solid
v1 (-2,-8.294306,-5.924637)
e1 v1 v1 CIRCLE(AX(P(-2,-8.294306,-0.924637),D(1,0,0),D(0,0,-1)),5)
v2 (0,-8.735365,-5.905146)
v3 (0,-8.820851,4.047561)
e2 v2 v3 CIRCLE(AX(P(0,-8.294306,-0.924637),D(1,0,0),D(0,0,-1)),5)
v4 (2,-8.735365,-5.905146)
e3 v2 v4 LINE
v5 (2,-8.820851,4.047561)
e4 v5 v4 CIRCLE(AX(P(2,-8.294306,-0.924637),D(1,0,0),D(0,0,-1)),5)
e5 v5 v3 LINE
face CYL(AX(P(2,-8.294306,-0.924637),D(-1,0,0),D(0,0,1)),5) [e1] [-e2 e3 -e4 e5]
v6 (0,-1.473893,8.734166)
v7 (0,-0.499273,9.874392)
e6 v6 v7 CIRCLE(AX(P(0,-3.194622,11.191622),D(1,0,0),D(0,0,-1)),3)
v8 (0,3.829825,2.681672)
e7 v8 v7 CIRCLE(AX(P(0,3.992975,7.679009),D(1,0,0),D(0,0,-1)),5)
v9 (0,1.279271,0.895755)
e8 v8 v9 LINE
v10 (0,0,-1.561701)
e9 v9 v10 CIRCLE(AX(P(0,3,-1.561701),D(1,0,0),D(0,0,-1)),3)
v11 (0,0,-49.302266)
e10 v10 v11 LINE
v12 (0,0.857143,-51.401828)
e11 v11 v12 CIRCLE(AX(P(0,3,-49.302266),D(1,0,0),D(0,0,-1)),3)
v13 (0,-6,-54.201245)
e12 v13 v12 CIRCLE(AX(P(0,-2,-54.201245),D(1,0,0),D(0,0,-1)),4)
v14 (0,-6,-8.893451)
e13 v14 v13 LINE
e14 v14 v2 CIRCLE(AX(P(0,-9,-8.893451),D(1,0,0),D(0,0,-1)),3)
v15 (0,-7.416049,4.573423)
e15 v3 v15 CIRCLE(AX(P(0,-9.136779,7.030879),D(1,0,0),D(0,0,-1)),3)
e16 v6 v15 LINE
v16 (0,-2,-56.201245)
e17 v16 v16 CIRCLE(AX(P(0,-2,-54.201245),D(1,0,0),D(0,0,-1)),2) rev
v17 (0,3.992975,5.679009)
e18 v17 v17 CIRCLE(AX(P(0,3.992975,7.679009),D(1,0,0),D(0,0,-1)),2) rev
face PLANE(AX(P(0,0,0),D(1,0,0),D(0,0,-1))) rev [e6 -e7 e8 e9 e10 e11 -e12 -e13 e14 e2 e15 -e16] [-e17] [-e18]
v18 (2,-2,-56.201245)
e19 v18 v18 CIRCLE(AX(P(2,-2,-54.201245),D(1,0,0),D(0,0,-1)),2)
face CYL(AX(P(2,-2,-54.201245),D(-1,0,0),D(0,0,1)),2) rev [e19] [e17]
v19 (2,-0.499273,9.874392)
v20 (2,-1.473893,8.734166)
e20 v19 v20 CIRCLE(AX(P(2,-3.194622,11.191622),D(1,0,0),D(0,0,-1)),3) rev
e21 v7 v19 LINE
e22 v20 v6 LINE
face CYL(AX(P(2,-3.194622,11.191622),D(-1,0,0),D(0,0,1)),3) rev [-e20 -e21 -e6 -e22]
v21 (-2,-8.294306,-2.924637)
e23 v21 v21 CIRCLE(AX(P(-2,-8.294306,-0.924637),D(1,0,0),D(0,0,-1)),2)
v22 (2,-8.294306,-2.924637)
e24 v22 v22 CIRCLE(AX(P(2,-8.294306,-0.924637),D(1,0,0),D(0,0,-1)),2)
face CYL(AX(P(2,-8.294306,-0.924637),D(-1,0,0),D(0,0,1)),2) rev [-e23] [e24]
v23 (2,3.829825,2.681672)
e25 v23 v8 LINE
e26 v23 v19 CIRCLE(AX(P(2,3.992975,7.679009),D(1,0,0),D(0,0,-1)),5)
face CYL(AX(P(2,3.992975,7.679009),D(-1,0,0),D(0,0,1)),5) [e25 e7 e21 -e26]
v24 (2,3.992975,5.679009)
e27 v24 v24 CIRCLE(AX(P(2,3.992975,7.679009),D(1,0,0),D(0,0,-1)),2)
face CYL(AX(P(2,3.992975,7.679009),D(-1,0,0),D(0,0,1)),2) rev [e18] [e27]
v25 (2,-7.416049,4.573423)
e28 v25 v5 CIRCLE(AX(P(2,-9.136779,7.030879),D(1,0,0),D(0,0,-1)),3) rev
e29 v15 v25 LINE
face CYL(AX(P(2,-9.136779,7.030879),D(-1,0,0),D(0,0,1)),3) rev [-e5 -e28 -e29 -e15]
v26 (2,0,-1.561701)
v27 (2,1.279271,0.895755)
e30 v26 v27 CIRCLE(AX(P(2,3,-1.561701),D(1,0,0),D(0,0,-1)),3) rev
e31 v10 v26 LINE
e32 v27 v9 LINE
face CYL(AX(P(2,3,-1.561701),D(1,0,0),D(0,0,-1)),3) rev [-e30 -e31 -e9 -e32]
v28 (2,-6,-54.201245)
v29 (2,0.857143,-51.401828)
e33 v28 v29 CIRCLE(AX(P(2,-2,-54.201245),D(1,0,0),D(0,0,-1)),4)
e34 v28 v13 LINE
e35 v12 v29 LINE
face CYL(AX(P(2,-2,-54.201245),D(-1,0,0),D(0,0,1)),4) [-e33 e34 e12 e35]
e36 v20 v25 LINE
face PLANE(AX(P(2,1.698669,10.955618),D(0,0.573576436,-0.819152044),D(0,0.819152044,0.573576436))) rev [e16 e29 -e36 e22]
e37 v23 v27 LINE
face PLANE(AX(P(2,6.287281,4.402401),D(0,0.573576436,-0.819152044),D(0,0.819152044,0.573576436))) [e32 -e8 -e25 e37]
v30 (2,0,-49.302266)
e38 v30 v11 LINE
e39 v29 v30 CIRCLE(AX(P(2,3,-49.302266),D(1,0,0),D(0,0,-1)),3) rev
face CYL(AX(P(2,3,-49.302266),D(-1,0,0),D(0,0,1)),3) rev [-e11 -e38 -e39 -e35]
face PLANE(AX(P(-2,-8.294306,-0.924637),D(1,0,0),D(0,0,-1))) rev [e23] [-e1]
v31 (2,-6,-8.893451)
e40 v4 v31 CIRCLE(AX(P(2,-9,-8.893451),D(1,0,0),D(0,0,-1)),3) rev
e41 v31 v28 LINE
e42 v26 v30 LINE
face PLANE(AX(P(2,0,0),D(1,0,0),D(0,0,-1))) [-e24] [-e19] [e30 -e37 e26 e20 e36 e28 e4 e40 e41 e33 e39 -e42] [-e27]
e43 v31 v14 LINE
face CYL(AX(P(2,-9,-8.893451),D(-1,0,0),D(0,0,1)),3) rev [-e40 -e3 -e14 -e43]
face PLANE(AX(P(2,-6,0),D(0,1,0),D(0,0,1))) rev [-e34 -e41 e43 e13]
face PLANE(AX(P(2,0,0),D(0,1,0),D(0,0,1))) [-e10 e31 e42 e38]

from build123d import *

# Parameters (mm, degrees)
EXTRUDE_1_DEPTH          = 2
EXTRUDE_START            = -2
SKETCH_1_4_R             = 5
EXTRUDE_2_DEPTH          = 2
CUT_EXTRUDE_1_DEPTH      = 60.733771951
CUT_EXTRUDE_1_DEPTH_BACK = 60.733771951
SKETCH_1_3_R             = 2
FILLET_1_R               = 3


with BuildPart() as part:
    # 草图1 → 凸台-拉伸1 (new body)
    with BuildSketch(Plane(origin=(0, 0, 0), x_dir=(0, 0, -1), z_dir=(1, 0, 0))):
        with BuildLine():
            Line((50.737143614, 0), (0, 0))
            Line((0, 0), (2.48051592, -3.542543867))
            ThreePointArc((2.48051592, -3.542543867), (4.165783411, -4.487079684), (5.367176995, -6))
            Line((5.367176995, -6), (54.201245229, -6))
            ThreePointArc((54.201245229, -6), (50.737143614, -4), (50.737143614, 0))
        make_face()
        with BuildLine():
            Line((2.48051592, -3.542543867), (0, 0))
            Line((0, 0), (-2.681672007, 3.829824531))
            ThreePointArc((-2.681672007, 3.829824531), (-4.811127311, -0.102785303), (-9.234888361, -0.758786959))
            Line((-9.234888361, -0.758786959), (-4.072700434, -8.131155358))
            ThreePointArc((-4.072700434, -8.131155358), (-1.94324513, -4.198545524), (2.48051592, -3.542543867))
        make_face()
        with BuildLine():
            ThreePointArc((58.201245229, -2), (55.23652141, 1.863703305), (50.737143614, 0))
            Line((50.737143614, 0), (54.201245229, 0))
            ThreePointArc((54.201245229, 0), (55.615458792, -0.585786438), (56.201245229, -2))
            ThreePointArc((56.201245229, -2), (55.615458792, -3.414213562), (54.201245229, -4))
            Line((54.201245229, -4), (54.201245229, -6))
            ThreePointArc((54.201245229, -6), (57.029672354, -4.828427125), (58.201245229, -2))
        make_face()
        with BuildLine():
            Line((54.201245229, 0), (50.737143614, 0))
            ThreePointArc((50.737143614, 0), (50.737143614, -4), (54.201245229, -6))
            Line((54.201245229, -6), (54.201245229, -4))
            ThreePointArc((54.201245229, -4), (52.201245229, -2), (54.201245229, 0))
        make_face()
        with BuildLine():
            ThreePointArc((5.367176995, -6), (4.165783411, -4.487079684), (2.48051592, -3.542543867))
            Line((2.48051592, -3.542543867), (4.201245229, -6))
            Line((4.201245229, -6), (5.367176995, -6))
        make_face()
        with BuildLine():
            Line((4.201245229, -6), (2.48051592, -3.542543867))
            ThreePointArc((2.48051592, -3.542543867), (-1.94324513, -4.198545524), (-4.072700434, -8.131155358))
            Line((-4.072700434, -8.131155358), (-2.351971125, -10.588611491))
            Line((-2.351971125, -10.588611491), (-0.713667036, -9.441458618))
            ThreePointArc((-0.713667036, -9.441458618), (-0.222515821, -6.656001657), (2.562941141, -7.147152873))
            Line((2.562941141, -7.147152873), (4.201245229, -6))
        make_face()
        with BuildLine():
            ThreePointArc((-9.234888361, -0.758786959), (-4.811127311, -0.102785303), (-2.681672007, 3.829824531))
            Line((-2.681672007, 3.829824531), (-4.402401316, 6.287280664))
            Line((-4.402401316, 6.287280664), (-6.040705405, 5.140127792))
            ThreePointArc((-6.040705405, 5.140127792), (-5.771575592, 4.594386518), (-5.679009493, 3.992974919))
            ThreePointArc((-5.679009493, 3.992974919), (-7.077597894, 2.085541017), (-9.317313582, 2.845822046))
            Line((-9.317313582, 2.845822046), (-10.95561767, 1.698669174))
            Line((-10.95561767, 1.698669174), (-9.234888361, -0.758786959))
        make_face()
        with BuildLine():
            Line((-4.402401316, 6.287280664), (-2.681672007, 3.829824531))
            ThreePointArc((-2.681672007, 3.829824531), (-2.679675166, 3.911388863), (-2.679009493, 3.992974919))
            ThreePointArc((-2.679009493, 3.992974919), (-10.613341245, 8.041394014), (-9.234888361, -0.758786959))
            Line((-9.234888361, -0.758786959), (-10.95561767, 1.698669174))
            Line((-10.95561767, 1.698669174), (-9.317313582, 2.845822046))
            ThreePointArc((-9.317313582, 2.845822046), (-8.826162366, 5.631279008), (-6.040705405, 5.140127792))
            Line((-6.040705405, 5.140127792), (-4.402401316, 6.287280664))
        make_face()
        with BuildLine():
            ThreePointArc((56.201245229, -2), (55.615458792, -0.585786438), (54.201245229, 0))
            Line((54.201245229, 0), (54.201245229, -4))
            ThreePointArc((54.201245229, -4), (55.615458792, -3.414213562), (56.201245229, -2))
        make_face()
        with BuildLine():
            Line((54.201245229, -4), (54.201245229, 0))
            ThreePointArc((54.201245229, 0), (52.201245229, -2), (54.201245229, -4))
        make_face()
        with BuildLine():
            Line((5.367176995, -6), (4.201245229, -6))
            Line((4.201245229, -6), (2.562941141, -7.147152873))
            ThreePointArc((2.562941141, -7.147152873), (2.832070954, -7.692894146), (2.924637052, -8.294305745))
            ThreePointArc((2.924637052, -8.294305745), (1.526048651, -10.201739647), (-0.713667036, -9.441458618))
            Line((-0.713667036, -9.441458618), (-2.351971125, -10.588611491))
            Line((-2.351971125, -10.588611491), (-4.072700434, -8.131155358))
            ThreePointArc((-4.072700434, -8.131155358), (0.843050996, -13.293640073), (5.924637052, -8.294305745))
            ThreePointArc((5.924637052, -8.294305745), (5.783273678, -7.113776143), (5.367176995, -6))
        make_face()
        with BuildLine():
            ThreePointArc((2.924637052, -8.294305745), (2.832070954, -7.692894146), (2.562941141, -7.147152873))
            Line((2.562941141, -7.147152873), (-0.713667036, -9.441458618))
            ThreePointArc((-0.713667036, -9.441458618), (1.526048651, -10.201739647), (2.924637052, -8.294305745))
        make_face()
        with BuildLine():
            Line((-0.713667036, -9.441458618), (2.562941141, -7.147152873))
            ThreePointArc((2.562941141, -7.147152873), (-0.222515821, -6.656001657), (-0.713667036, -9.441458618))
        make_face()
        with BuildLine():
            ThreePointArc((-5.679009493, 3.992974919), (-5.771575592, 4.594386518), (-6.040705405, 5.140127792))
            Line((-6.040705405, 5.140127792), (-9.317313582, 2.845822046))
            ThreePointArc((-9.317313582, 2.845822046), (-7.077597894, 2.085541017), (-5.679009493, 3.992974919))
        make_face()
        with BuildLine():
            Line((-9.317313582, 2.845822046), (-6.040705405, 5.140127792))
            ThreePointArc((-6.040705405, 5.140127792), (-8.826162366, 5.631279008), (-9.317313582, 2.845822046))
        make_face()
    extrude(amount=EXTRUDE_1_DEPTH)

    # 草图1<4> → 凸台-拉伸2 (add)
    with BuildSketch(Plane(origin=(0, 0, 0), x_dir=(0, 0, -1), z_dir=(1, 0, 0)).offset(EXTRUDE_START)):
        with Locations(Location((0.924637052, -8.294305745, 0), (0, 0, 178.130102354))):
            Circle(SKETCH_1_4_R)
    extrude(amount=EXTRUDE_2_DEPTH)

    # 草图1<3> → 切除-拉伸1 (cut, two sides: drawn at the far end of the back side and taken through both)
    with BuildSketch(Plane(origin=(0, 0, 0), x_dir=(0, 0, -1), z_dir=(1, 0, 0)).offset(-CUT_EXTRUDE_1_DEPTH_BACK)):
        with Locations((-7.679009493, 3.992974919)):
            Circle(SKETCH_1_3_R)
        with Locations((54.201245229, -2)):
            Circle(SKETCH_1_3_R)
        with Locations((0.924637052, -8.294305745)):
            Circle(SKETCH_1_3_R)
    extrude(amount=CUT_EXTRUDE_1_DEPTH + CUT_EXTRUDE_1_DEPTH_BACK, mode=Mode.SUBTRACT)

    # 圆角1
    # the kernel refuses this fillet: 3 mm, written as the material it adds along each edge
    with BuildSketch(Plane(origin=(0, -6, -5.367176995), x_dir=(0, 0, -1), z_dir=(1, 0, 0))) as fillet_1_piece_1:
        with BuildLine():
            CenterArc((3.526273997, -3), FILLET_1_R, 90, 84.939259464)
            ThreePointArc((0.53796877, -2.735364655), (0.463478447, -1.329430853), (0, 0))
            Line((0, 0), (3.526273997, 0))
        make_face()
    extrude(amount=2)
    with BuildSketch(Plane(origin=(0, 0, 0), x_dir=(0, 0, -1), z_dir=(1, 0, 0))) as fillet_1_piece_2:
        with BuildLine():
            CenterArc((FILLET_1_R * 0.520567050552, FILLET_1_R), FILLET_1_R, 215, 55)
            Line((-FILLET_1_R * 0.298584993737, FILLET_1_R * 0.426423563649), (0, 0))
            Line((0, 0), (FILLET_1_R * 0.520567050552, 0))
        make_face()
    extrude(amount=2)
    with BuildSketch(Plane(origin=(0, 0, -50.737143614), x_dir=(0, 0.7902368852402493, -0.6128014892326789), z_dir=(1, 0, 0))) as fillet_1_piece_3:
        with BuildLine():
            CenterArc((1.49141536, 2.972297887), FILLET_1_R, 217.792345701, 44.415308597)
            Line((-0.879295296, 1.133893419), (0, 0))
            ThreePointArc((0, 0), (0.542332858, 0.036936151), (1.084665716, 0))
        make_face()
    extrude(amount=2)
    with BuildSketch(Plane(origin=(0, -0.758786959, 9.234888361), x_dir=(0, -0.8191520442889745, -0.5735764363510707), z_dir=(1, 0, 0))) as fillet_1_piece_4:
        with BuildLine():
            CenterArc((0.872983346, -3), FILLET_1_R, 90, 28.955024372)
            ThreePointArc((-0.579385409, -0.375), (-0.283214788, -0.19750856), (0, 0))
            Line((0, 0), (0.872983346, 0))
        make_face()
    extrude(amount=2)
    with BuildSketch(Plane(origin=(0, -8.131155358, 4.072700434), x_dir=(0, -0.9993363396246481, -0.03642636827368134), z_dir=(1, 0, 0))) as fillet_1_piece_5:
        with BuildLine():
            CenterArc((0.897200113, -2.992846785), FILLET_1_R, 93.957436637, 28.955024372)
            Line((-0.732871014, -0.474341649), (0, 0))
            ThreePointArc((0, 0), (0.345076967, -0.011922025), (0.690153933, 0))
        make_face()
    extrude(amount=2)


solid = part.part
